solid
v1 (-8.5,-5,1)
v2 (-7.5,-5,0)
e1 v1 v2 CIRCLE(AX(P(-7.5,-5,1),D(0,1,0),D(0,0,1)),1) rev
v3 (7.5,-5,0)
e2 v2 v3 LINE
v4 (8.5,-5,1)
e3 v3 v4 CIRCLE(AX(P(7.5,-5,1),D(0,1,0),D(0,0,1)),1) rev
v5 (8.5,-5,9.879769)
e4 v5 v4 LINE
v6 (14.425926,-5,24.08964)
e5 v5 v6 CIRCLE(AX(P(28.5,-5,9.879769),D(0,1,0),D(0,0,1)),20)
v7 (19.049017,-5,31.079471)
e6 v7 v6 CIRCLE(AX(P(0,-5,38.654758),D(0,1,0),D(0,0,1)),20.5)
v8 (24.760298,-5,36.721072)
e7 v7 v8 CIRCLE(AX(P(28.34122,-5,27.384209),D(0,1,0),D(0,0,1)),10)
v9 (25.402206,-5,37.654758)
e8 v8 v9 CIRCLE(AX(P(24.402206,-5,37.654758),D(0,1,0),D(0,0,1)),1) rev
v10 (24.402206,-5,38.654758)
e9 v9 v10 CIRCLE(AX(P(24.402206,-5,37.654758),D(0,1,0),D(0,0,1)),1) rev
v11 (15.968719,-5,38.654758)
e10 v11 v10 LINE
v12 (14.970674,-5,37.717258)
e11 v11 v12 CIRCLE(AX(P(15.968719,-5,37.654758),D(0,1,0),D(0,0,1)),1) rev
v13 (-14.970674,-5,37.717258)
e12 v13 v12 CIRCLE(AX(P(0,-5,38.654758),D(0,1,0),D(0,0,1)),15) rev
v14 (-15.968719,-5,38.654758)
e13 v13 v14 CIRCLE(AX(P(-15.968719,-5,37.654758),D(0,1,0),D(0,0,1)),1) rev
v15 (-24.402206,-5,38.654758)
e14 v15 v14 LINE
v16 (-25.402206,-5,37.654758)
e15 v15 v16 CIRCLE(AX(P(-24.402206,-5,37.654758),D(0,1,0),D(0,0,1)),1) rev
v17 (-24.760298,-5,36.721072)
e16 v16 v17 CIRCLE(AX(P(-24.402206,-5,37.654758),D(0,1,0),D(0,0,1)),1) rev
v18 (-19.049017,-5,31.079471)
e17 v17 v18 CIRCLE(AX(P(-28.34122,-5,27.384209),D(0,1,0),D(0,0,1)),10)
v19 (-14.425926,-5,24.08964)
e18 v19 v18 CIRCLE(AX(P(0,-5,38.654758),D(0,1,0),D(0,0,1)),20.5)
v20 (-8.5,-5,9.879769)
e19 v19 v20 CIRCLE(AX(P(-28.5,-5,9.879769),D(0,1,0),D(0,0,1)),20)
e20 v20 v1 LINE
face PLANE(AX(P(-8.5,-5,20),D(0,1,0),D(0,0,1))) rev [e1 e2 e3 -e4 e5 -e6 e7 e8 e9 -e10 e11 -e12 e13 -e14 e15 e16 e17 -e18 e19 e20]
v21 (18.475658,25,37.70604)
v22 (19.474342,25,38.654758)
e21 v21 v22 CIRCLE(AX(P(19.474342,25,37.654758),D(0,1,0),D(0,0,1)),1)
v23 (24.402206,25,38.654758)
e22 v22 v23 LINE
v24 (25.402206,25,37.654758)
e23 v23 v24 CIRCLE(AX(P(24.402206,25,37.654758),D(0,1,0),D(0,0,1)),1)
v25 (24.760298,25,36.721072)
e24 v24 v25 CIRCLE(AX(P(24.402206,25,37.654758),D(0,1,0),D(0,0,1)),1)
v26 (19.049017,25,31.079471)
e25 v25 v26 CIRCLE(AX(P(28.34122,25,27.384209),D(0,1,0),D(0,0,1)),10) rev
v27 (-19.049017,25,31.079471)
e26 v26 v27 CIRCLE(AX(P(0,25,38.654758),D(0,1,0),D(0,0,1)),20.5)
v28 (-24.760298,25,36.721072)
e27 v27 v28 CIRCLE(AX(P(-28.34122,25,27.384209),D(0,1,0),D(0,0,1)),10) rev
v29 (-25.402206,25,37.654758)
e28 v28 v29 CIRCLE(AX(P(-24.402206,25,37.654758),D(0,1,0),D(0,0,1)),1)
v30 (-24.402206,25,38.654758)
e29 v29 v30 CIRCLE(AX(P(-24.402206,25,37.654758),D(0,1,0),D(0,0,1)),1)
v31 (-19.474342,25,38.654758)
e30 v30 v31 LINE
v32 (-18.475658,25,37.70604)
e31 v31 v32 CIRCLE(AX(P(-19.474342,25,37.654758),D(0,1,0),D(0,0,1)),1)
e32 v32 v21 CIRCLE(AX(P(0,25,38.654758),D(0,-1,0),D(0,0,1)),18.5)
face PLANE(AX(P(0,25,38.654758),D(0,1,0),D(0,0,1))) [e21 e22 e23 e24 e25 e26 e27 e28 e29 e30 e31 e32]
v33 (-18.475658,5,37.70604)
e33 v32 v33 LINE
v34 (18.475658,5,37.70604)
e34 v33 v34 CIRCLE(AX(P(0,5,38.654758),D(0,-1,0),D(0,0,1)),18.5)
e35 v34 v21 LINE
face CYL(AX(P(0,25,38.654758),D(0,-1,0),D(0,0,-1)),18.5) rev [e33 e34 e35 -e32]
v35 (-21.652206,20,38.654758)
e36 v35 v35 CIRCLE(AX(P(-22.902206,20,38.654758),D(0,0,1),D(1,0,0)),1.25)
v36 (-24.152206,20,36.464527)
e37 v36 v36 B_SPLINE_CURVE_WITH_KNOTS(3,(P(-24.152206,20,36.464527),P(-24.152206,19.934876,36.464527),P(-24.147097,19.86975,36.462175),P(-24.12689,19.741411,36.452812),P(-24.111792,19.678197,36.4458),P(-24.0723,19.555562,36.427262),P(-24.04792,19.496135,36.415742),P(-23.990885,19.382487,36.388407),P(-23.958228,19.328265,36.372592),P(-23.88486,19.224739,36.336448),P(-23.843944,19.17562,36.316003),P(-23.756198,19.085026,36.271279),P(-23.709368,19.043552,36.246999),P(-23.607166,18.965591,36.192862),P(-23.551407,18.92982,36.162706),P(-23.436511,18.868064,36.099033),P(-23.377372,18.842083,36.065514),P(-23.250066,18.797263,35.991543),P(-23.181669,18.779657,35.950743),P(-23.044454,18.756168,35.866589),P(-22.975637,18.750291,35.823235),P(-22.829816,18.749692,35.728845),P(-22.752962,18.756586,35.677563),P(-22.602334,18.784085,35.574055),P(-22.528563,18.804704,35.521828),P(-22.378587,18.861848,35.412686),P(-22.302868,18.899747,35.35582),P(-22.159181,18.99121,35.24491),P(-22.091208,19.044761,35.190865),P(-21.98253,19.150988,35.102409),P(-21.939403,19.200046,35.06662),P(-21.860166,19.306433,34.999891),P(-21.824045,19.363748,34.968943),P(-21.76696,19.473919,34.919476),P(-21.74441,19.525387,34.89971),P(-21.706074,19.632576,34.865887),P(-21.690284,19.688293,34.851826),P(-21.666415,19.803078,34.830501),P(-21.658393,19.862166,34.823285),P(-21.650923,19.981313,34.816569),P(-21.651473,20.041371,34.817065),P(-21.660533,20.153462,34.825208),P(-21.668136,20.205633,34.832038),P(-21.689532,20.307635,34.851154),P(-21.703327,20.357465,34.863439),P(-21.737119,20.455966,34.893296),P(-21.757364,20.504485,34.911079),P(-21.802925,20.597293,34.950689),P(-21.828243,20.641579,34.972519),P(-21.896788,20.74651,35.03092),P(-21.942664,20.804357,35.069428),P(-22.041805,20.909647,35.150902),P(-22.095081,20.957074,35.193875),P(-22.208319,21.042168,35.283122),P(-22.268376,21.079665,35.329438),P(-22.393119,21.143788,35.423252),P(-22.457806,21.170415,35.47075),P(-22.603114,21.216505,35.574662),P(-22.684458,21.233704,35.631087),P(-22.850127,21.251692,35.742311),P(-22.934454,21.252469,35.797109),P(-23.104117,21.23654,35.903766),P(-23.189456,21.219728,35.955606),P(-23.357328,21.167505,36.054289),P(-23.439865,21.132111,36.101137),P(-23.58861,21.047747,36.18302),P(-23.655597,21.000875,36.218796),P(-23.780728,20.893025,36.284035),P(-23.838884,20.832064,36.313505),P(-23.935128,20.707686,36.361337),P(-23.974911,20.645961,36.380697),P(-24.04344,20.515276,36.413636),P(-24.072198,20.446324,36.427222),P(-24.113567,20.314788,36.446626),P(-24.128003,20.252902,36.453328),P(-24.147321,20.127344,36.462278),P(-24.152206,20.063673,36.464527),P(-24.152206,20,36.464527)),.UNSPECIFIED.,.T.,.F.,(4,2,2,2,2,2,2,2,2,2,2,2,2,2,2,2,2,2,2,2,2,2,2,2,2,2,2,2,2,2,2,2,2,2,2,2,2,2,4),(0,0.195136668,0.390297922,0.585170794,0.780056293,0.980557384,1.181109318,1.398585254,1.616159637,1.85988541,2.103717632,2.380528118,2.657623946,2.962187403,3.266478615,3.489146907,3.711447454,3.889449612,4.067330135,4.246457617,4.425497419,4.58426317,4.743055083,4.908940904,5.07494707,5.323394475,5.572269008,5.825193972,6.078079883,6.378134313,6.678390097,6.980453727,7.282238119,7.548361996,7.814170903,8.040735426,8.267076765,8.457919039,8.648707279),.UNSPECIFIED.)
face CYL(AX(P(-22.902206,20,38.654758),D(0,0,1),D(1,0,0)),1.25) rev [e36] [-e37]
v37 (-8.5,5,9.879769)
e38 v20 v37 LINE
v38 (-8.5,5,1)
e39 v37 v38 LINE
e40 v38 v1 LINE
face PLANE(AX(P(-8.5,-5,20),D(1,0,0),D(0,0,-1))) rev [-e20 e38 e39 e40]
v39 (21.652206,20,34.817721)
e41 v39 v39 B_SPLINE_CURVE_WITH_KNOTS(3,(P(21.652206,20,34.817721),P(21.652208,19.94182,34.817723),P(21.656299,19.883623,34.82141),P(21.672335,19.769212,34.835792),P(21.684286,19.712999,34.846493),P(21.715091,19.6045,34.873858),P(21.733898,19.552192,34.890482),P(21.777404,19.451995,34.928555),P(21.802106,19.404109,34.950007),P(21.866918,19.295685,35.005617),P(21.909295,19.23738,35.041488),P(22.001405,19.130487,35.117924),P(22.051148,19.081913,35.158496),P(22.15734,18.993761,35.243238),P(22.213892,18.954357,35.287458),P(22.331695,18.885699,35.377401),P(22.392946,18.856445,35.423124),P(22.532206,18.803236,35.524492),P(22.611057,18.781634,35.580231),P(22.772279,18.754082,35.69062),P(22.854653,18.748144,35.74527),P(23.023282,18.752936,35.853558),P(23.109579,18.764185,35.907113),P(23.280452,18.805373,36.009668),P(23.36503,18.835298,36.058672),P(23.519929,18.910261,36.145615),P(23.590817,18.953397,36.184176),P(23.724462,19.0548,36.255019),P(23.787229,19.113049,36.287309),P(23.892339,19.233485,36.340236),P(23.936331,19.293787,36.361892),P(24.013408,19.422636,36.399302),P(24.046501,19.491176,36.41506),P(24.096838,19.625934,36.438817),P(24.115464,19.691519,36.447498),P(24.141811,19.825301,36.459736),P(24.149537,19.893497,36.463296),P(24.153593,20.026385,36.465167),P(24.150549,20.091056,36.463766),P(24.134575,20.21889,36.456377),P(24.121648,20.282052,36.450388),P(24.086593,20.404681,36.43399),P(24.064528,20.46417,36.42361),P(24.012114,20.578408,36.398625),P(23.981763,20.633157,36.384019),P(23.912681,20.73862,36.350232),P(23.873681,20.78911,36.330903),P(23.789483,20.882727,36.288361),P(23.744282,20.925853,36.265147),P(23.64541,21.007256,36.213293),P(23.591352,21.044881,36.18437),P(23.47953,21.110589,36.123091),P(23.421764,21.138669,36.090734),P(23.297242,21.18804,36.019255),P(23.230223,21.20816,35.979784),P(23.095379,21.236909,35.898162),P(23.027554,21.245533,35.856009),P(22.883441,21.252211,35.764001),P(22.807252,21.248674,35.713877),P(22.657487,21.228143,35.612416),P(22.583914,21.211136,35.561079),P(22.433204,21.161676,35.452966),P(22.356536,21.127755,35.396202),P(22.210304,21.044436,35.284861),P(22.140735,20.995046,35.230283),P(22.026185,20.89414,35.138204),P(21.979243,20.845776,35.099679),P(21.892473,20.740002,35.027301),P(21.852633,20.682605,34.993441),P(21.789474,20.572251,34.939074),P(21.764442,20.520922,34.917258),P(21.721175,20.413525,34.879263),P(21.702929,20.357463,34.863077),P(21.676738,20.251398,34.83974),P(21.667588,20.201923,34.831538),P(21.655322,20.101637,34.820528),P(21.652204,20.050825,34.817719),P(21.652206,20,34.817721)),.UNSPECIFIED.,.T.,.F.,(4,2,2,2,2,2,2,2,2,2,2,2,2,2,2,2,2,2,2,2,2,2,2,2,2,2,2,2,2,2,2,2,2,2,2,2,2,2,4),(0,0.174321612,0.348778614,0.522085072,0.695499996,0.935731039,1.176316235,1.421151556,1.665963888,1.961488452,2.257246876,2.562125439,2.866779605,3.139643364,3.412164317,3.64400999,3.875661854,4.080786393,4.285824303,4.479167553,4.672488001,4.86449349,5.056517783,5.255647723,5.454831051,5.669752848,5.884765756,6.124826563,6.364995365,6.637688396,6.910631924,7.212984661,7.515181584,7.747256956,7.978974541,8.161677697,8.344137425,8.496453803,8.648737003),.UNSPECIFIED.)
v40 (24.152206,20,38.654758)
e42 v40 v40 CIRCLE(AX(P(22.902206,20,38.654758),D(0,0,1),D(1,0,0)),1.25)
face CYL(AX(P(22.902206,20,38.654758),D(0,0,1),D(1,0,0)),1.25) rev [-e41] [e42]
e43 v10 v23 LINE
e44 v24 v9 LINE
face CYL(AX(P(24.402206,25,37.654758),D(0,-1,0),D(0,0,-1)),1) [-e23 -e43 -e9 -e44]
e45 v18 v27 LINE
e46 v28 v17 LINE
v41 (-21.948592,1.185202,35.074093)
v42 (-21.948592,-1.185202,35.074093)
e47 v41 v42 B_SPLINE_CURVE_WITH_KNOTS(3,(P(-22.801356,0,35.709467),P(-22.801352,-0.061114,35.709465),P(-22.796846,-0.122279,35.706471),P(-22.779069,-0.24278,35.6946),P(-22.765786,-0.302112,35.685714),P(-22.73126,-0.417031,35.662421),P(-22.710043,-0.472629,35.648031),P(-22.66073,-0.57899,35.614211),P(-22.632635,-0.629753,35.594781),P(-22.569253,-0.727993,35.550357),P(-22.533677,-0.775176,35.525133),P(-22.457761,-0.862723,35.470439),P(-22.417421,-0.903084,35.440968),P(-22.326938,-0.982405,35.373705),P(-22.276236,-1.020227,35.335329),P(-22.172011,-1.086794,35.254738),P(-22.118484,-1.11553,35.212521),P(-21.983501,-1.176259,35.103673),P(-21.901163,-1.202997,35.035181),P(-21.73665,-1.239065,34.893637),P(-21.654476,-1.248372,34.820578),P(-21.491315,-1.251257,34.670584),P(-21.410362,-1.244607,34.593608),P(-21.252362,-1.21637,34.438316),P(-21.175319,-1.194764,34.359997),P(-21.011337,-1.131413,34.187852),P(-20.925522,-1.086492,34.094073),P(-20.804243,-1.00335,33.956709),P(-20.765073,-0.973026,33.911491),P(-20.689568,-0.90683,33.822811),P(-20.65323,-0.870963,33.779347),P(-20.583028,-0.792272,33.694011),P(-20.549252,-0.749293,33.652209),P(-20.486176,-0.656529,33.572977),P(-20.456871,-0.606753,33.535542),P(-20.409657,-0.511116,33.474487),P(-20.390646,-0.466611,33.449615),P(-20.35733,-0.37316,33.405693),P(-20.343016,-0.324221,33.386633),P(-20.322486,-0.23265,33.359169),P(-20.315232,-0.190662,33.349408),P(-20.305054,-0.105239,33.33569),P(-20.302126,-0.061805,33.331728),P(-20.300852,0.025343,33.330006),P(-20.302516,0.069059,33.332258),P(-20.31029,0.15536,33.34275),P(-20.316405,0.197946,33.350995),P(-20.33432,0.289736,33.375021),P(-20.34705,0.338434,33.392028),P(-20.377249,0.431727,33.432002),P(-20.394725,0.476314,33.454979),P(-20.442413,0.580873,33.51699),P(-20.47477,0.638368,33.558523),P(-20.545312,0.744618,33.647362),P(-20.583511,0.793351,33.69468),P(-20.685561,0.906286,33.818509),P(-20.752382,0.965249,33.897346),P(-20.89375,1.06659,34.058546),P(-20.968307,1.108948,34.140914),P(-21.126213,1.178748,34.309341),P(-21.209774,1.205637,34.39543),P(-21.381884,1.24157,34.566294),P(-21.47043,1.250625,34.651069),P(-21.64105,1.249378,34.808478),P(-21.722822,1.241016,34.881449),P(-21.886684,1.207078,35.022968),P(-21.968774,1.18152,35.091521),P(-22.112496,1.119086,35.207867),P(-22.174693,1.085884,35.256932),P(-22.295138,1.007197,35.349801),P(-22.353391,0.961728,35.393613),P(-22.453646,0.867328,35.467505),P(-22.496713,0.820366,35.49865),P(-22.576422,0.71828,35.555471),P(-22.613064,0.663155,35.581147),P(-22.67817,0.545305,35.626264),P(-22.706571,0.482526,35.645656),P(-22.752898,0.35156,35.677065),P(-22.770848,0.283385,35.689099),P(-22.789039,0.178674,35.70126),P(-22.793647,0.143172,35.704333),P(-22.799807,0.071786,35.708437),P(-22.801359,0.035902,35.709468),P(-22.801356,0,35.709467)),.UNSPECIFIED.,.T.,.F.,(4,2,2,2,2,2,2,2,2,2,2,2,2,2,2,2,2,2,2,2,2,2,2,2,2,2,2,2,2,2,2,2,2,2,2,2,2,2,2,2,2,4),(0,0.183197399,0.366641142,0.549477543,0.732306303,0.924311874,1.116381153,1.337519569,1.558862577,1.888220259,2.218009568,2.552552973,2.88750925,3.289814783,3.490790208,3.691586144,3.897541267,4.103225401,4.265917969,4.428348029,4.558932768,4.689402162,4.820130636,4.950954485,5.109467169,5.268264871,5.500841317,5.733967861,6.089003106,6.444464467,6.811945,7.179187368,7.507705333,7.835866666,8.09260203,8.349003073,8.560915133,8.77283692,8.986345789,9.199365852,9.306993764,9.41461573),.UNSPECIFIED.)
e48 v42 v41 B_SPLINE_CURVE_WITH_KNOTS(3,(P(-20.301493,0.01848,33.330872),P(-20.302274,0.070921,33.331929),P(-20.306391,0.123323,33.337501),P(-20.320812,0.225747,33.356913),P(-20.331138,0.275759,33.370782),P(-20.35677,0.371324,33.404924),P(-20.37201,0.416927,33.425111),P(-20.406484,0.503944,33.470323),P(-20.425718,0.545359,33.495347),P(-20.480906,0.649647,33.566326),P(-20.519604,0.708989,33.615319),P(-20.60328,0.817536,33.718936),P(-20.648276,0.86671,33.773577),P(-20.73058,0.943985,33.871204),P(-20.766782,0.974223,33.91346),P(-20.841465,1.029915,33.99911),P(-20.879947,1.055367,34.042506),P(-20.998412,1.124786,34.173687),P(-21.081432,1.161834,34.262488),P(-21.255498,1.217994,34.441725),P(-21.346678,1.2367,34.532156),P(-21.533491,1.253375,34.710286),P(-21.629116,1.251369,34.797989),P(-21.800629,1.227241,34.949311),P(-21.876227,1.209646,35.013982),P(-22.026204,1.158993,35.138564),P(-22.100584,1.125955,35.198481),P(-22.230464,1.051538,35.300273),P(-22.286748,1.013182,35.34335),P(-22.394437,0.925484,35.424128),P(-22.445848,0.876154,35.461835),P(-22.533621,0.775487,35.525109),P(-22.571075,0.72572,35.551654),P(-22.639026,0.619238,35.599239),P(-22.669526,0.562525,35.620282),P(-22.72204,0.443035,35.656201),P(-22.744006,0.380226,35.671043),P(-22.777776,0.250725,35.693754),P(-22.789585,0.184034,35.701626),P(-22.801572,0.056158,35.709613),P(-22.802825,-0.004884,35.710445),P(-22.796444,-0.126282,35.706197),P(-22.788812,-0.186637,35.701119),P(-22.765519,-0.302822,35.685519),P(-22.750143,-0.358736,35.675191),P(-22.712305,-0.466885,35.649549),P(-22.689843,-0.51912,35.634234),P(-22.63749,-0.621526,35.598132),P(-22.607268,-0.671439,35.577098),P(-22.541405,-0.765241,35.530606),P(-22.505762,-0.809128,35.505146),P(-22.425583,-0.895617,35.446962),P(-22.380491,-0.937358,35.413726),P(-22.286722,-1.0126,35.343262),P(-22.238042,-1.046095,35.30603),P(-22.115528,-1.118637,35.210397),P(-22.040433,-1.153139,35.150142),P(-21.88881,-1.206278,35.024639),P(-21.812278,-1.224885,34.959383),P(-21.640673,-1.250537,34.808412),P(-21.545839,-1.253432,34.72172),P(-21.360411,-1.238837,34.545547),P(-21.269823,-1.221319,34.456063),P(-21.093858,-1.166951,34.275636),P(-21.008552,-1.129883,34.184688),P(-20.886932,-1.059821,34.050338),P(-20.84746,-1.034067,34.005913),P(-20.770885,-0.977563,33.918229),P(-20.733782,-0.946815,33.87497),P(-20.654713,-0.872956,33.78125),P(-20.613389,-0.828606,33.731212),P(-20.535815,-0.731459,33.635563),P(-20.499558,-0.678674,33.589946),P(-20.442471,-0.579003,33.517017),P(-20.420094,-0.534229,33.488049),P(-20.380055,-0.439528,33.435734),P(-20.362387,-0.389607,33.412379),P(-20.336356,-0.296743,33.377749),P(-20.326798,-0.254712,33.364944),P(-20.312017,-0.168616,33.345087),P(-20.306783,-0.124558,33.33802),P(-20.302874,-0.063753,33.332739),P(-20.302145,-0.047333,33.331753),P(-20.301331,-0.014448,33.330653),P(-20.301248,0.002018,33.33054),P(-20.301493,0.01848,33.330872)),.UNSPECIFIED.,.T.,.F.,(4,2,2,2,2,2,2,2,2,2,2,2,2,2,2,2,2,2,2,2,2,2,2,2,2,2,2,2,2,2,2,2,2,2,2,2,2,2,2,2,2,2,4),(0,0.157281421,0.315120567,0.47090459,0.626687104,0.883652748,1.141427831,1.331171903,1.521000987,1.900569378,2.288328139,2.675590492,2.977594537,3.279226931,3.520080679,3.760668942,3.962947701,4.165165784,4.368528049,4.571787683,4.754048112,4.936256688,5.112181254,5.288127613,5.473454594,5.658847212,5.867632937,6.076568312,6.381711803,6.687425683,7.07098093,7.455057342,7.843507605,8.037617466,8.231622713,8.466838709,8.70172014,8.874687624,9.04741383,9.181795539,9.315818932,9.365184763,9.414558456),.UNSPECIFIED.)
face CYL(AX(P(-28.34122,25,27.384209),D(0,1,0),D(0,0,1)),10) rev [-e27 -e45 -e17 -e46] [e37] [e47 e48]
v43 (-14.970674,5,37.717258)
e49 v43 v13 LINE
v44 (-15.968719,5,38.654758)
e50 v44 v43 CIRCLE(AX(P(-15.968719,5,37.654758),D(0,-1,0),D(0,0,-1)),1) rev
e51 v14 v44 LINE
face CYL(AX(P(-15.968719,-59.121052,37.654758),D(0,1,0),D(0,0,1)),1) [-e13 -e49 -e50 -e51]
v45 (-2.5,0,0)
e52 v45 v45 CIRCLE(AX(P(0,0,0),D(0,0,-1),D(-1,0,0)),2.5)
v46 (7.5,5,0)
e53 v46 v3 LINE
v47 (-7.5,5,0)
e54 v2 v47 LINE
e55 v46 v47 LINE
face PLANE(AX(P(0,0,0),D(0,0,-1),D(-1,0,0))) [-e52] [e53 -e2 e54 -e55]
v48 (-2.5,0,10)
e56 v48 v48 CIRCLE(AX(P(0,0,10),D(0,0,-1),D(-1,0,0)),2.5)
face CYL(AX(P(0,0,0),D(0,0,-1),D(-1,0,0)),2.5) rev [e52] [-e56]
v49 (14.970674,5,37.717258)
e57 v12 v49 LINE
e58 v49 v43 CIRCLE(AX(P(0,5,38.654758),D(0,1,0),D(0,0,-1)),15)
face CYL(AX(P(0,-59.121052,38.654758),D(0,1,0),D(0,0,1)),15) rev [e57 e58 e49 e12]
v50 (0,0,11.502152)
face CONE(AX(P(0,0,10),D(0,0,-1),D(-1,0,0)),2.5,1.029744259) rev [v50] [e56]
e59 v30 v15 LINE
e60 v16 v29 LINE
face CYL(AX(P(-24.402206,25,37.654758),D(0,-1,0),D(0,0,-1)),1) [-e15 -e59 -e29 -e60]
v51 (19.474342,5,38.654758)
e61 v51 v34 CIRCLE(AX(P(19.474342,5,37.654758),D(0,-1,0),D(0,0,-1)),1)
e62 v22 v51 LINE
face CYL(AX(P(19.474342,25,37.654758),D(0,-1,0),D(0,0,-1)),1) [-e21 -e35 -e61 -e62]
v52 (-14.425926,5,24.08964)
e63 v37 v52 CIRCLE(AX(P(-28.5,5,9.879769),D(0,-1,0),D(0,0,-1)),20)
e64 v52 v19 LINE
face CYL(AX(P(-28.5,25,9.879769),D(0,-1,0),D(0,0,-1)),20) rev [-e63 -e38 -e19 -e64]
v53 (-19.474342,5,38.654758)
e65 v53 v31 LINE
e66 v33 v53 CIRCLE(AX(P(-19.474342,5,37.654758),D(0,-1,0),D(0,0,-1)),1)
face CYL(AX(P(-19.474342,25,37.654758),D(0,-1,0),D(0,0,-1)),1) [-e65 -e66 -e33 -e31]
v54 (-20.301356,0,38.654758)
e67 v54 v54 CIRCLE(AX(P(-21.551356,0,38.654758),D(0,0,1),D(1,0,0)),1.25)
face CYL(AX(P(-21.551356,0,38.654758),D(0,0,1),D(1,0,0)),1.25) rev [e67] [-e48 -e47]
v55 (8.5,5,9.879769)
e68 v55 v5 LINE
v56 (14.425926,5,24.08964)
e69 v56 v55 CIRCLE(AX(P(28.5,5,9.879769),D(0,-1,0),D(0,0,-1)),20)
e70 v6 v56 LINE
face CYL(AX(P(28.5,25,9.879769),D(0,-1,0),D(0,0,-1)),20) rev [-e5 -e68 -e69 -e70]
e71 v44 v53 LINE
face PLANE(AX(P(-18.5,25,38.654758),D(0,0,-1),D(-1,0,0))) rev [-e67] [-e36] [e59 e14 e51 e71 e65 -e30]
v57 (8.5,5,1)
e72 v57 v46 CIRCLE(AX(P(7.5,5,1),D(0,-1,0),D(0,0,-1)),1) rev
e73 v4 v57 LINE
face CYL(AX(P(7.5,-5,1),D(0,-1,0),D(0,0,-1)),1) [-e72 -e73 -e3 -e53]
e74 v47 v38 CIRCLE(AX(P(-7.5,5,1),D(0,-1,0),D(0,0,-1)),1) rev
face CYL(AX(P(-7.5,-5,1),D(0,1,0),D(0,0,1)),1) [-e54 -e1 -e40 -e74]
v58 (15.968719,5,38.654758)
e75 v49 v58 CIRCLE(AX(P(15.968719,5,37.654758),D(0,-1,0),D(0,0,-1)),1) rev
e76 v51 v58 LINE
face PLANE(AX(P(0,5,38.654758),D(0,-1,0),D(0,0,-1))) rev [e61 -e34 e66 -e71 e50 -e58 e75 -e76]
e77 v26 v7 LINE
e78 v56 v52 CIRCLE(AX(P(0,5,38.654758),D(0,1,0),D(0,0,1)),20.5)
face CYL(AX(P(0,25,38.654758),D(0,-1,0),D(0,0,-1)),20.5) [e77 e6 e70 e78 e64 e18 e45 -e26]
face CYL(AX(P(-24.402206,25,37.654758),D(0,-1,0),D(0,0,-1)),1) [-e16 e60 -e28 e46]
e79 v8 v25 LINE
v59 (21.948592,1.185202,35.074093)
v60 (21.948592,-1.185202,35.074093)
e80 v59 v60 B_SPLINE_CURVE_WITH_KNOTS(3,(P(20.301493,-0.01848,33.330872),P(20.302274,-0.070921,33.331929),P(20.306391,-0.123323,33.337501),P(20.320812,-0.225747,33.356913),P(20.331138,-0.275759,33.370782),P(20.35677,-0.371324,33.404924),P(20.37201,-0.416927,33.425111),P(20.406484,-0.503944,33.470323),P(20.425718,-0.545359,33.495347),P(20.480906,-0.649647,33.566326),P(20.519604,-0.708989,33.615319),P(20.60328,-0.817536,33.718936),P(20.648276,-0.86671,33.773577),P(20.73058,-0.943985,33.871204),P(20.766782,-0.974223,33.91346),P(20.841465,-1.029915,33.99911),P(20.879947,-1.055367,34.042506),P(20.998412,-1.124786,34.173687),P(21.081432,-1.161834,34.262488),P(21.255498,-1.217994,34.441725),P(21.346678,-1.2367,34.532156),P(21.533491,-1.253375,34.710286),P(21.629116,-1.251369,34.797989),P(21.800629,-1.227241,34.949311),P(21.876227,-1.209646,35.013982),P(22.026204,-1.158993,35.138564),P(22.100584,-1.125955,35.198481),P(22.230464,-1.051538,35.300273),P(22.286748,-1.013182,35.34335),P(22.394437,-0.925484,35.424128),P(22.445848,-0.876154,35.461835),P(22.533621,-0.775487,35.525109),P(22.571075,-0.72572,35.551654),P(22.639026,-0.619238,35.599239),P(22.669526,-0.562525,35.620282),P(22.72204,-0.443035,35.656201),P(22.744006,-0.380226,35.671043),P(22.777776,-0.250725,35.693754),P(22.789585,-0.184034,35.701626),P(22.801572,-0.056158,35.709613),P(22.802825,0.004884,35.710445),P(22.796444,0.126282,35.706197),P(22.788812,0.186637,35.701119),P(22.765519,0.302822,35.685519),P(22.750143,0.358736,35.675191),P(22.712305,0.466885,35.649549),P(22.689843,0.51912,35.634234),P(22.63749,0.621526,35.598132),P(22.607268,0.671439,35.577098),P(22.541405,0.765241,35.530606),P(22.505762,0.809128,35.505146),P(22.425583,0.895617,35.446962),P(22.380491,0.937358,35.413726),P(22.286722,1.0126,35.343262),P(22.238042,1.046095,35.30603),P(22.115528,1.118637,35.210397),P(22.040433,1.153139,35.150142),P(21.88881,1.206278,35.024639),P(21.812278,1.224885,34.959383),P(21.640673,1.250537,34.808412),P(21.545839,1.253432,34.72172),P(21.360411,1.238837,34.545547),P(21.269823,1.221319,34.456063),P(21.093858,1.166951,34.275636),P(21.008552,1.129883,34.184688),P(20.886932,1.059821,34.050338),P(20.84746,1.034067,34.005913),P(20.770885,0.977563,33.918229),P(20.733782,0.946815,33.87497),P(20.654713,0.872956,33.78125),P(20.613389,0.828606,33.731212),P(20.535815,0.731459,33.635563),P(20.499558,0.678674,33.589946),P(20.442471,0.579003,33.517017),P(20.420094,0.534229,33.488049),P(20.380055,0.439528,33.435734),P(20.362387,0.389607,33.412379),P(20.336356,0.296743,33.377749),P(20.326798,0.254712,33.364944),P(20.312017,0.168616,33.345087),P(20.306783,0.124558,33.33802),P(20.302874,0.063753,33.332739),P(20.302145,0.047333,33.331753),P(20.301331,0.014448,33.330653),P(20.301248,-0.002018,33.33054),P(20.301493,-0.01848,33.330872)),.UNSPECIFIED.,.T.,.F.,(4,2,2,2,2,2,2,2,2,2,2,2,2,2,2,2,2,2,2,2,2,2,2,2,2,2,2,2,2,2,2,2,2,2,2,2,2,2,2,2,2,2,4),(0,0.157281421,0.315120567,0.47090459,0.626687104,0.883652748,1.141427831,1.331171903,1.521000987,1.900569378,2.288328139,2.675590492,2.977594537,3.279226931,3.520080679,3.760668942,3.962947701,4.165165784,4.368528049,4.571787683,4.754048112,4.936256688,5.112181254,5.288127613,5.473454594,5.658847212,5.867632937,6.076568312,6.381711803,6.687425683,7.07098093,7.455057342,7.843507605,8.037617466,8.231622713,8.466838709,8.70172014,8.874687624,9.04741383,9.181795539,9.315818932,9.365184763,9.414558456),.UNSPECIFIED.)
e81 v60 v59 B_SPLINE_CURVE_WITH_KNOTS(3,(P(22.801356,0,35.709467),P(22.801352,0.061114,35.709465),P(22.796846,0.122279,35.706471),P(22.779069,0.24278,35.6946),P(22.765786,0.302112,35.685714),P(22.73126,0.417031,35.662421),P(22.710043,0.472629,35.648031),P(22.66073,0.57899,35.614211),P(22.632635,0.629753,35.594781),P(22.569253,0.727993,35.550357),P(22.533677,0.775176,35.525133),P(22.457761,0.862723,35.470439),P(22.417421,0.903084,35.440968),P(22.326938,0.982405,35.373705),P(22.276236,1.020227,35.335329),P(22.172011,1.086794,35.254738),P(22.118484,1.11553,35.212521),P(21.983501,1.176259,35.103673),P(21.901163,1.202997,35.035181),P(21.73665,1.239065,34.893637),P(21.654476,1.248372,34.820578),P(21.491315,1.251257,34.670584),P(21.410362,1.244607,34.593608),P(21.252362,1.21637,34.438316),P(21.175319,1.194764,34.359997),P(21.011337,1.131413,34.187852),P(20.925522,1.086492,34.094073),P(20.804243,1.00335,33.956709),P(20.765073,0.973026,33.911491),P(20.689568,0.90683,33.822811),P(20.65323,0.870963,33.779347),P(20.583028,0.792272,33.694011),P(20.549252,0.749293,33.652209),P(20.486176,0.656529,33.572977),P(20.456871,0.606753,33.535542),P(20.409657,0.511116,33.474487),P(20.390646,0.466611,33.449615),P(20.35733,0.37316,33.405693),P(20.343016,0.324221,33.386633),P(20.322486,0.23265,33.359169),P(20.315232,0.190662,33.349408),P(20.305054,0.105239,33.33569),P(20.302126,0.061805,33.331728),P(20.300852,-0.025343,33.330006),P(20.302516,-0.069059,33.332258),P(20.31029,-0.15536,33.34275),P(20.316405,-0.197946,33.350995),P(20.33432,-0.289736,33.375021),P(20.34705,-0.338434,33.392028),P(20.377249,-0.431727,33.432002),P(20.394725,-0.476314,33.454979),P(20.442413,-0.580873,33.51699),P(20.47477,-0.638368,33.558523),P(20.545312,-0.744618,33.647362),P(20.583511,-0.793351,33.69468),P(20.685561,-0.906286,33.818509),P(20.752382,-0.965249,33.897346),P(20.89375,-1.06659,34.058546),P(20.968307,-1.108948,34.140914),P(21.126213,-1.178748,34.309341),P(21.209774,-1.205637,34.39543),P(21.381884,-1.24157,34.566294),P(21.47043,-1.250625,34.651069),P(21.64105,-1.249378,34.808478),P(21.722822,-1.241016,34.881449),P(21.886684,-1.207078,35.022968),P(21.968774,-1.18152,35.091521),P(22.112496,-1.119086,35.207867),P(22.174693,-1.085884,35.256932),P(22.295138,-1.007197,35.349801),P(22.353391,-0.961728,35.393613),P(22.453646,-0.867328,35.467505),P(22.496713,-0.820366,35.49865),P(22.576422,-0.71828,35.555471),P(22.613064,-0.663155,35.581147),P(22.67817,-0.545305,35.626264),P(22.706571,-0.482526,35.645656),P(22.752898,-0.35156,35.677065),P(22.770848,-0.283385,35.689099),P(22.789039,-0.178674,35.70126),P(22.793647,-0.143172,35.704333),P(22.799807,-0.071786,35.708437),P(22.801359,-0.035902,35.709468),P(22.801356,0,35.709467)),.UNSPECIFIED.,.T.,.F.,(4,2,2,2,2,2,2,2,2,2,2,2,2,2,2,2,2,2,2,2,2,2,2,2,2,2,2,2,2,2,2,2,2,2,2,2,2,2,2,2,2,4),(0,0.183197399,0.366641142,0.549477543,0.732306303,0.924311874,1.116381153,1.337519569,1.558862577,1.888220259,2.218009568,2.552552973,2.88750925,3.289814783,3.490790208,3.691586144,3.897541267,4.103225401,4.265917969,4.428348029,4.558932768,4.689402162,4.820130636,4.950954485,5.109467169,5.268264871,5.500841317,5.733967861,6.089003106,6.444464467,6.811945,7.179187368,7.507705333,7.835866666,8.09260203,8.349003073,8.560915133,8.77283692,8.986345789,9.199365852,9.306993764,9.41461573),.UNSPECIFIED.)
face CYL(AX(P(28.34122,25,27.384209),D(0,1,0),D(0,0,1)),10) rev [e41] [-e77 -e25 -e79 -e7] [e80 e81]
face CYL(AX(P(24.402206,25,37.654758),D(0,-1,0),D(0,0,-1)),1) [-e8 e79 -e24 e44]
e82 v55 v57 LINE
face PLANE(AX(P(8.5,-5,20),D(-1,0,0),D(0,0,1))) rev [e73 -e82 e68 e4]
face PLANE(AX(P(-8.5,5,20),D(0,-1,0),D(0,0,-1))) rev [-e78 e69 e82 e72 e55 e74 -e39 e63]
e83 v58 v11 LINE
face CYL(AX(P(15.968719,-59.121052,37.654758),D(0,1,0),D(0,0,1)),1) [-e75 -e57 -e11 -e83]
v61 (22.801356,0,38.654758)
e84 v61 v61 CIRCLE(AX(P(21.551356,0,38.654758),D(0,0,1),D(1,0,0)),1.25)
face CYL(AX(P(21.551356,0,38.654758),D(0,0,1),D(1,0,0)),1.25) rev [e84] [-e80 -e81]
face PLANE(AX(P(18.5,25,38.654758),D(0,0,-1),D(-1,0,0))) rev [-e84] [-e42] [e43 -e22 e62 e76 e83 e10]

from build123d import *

# Parameters (mm, degrees)
ESQUISSE1_W                               = 17
ESQUISSE1_H                               = 10
BOSS_EXTRU_1_DEPTH                        = 20
TROUS_DE_CENTRAGE_5_0MM1_D                = 5
TROUS_DE_CENTRAGE_5_0MM1_DEPTH            = 10
TROUS_DE_CENTRAGE_5_0MM1_TIP              = 1.502151548
BOSS_EXTRU_2_DEPTH                        = 20
BOSS_EXTRU_3_START                        = 10
BOSS_EXTRU_3_DEPTH                        = 10
CONG_1_R                                  = 20
TROU_POUR_TARAUDAGE_POUR_TROU_TARAUD_M3_D = 2.5
CONG_2_R                                  = 1
CONG_3_START                              = -5
CONG_3_DEPTH                              = 30
CONG_3_START_2                            = 32
CONG_3_2_OUTLINE_R                        = 1.25
CONG_3_2_DEPTH                            = 4.654758106


with BuildPart() as part:
    # Esquisse1 → Boss.-Extru.1 (new body)
    with BuildSketch(Plane.XY):
        Rectangle(ESQUISSE1_W, ESQUISSE1_H)
    extrude(amount=BOSS_EXTRU_1_DEPTH)

    # Trous de centrage Ø5.0mm1
    with Locations(Plane(origin=(0, 0, 0), x_dir=(-1, 0, 0), z_dir=(0, 0, -1))):
        with Locations((0, 0)):
            Hole(TROUS_DE_CENTRAGE_5_0MM1_D / 2, depth=TROUS_DE_CENTRAGE_5_0MM1_DEPTH)
            with Locations((0, 0, -(TROUS_DE_CENTRAGE_5_0MM1_DEPTH + TROUS_DE_CENTRAGE_5_0MM1_TIP / 2))):  # 118° drill point
                Cone(0, TROUS_DE_CENTRAGE_5_0MM1_D / 2, TROUS_DE_CENTRAGE_5_0MM1_TIP, mode=Mode.SUBTRACT)

    # Esquisse4 → Boss.-Extru.2 (add)
    with BuildSketch(Plane(origin=(0, 5, 0), x_dir=(1, 0, 0), z_dir=(0, 1, 0))):
        with BuildLine():
            Line((18.5, -38.654758106), (25.402205763, -38.654758106))
            Line((25.402205763, -38.654758106), (25.402205763, -36.654758106))
            Line((25.402205763, -36.654758106), (20.402205763, -36.654758106))
            ThreePointArc((20.402205763, -36.654758106), (0, -18.154758106), (-20.402205763, -36.654758106))
            Line((-20.402205763, -36.654758106), (-25.402205763, -36.654758106))
            Line((-25.402205763, -36.654758106), (-25.402205763, -38.654758106))
            Line((-25.402205763, -38.654758106), (-18.5, -38.654758106))
            ThreePointArc((-18.5, -38.654758106), (0, -20.154758106), (18.5, -38.654758106))
        make_face()
    extrude(amount=BOSS_EXTRU_2_DEPTH)

    # Esquisse5 → Boss.-Extru.3 (add)
    with BuildSketch(Plane.XZ.offset(-5).offset(BOSS_EXTRU_3_START)):
        with BuildLine():
            Line((-18.5, 38.654758106), (-15, 38.654758106))
            ThreePointArc((-15, 38.654758106), (0, 23.654758106), (15, 38.654758106))
            Line((15, 38.654758106), (18.5, 38.654758106))
            Line((18.5, 38.654758106), (25.402205763, 38.654758106))
            Line((25.402205763, 38.654758106), (25.402205763, 36.654758106))
            Line((25.402205763, 36.654758106), (20.402205763, 36.654758106))
            ThreePointArc((20.402205763, 36.654758106), (16.678717468, 26.735429953), (8.5, 20))
            Line((8.5, 20), (-8.5, 20))
            ThreePointArc((-8.5, 20), (-16.678717468, 26.735429953), (-20.402205763, 36.654758106))
            Line((-20.402205763, 36.654758106), (-25.402205763, 36.654758106))
            Line((-25.402205763, 36.654758106), (-25.402205763, 38.654758106))
            Line((-25.402205763, 38.654758106), (-18.5, 38.654758106))
        make_face()
    extrude(amount=-BOSS_EXTRU_3_DEPTH)

    # Congé1
    cong_1_edges = [part.edges().sort_by_distance(p)[0] for p in [
        (-8.5, 0, 20),
        (8.5, 0, 20),
    ]]
    fillet(cong_1_edges, radius=CONG_1_R)

    # Trou pour taraudage pour trou taraudé M31 (through all)
    with Locations(Plane.XY.offset(38.654758106)):
        with Locations((-22.902205763, 20), (-21.551356318, 0), (21.551356318, 0), (22.902205763, 20)):
            Hole(TROU_POUR_TARAUDAGE_POUR_TROU_TARAUD_M3_D / 2)

    # Congé2
    cong_2_edges = [part.edges().sort_by_distance(p)[0] for p in [
        (-15, 0, 38.654758106),
        (-8.5, 0, 0),
        (8.5, 0, 0),
        (25.402205763, 10, 36.654758106),
        (-25.402205763, 10, 36.654758106),
        (25.402205763, 10, 38.654758106),
        (18.5, 15, 38.654758106),
        (-18.5, 15, 38.654758106),
        (15, 0, 38.654758106),
        (-25.402205763, 10, 38.654758106),
    ]]
    fillet(cong_2_edges, radius=CONG_2_R - 0.0001)  # a hair under: the kernel refuses the full size

    # Congé3: read off the stored shape, not the designer's step
    # Congé3 outline → Congé3 (add)
    with BuildSketch(Plane(origin=(0, 0, 0), x_dir=(1, 0, 0), z_dir=(0, 1, 0)).offset(CONG_3_START)):
        with BuildLine():
            ThreePointArc((-20.402205763, -36.654758106), (-19.921613651, -33.819542541), (-19.049016512, -31.079471318))
            ThreePointArc((-19.049016512, -31.079471318), (-21.313684521, -34.498543554), (-24.760297938, -36.721071866))
            ThreePointArc((-24.760297938, -36.721071866), (-24.584296071, -36.671476295), (-24.402205763, -36.654758106))
            Line((-24.402205763, -36.654758106), (-20.402205763, -36.654758106))
        make_face()
        with BuildLine():
            ThreePointArc((24.760297938, -36.721071866), (21.313684521, -34.498543554), (19.049016512, -31.079471318))
            ThreePointArc((19.049016512, -31.079471318), (19.921613651, -33.819542541), (20.402205763, -36.654758106))
            Line((20.402205763, -36.654758106), (24.402205763, -36.654758106))
            ThreePointArc((24.402205763, -36.654758106), (24.584296071, -36.671476295), (24.760297938, -36.721071866))
        make_face()
    extrude(amount=CONG_3_DEPTH)

    # Cong_3 2 outline → Cong_3 2 (cut)
    with BuildSketch(Plane.XY.offset(CONG_3_START_2)):
        with Locations((22.902205763, 20)):
            Circle(CONG_3_2_OUTLINE_R)
        with Locations((21.551356318, 0)):
            Circle(CONG_3_2_OUTLINE_R)
        with Locations((-21.551356318, 0)):
            Circle(CONG_3_2_OUTLINE_R)
        with Locations((-22.902205763, 20)):
            Circle(CONG_3_2_OUTLINE_R)
    extrude(amount=CONG_3_2_DEPTH, mode=Mode.SUBTRACT)


solid = part.part
